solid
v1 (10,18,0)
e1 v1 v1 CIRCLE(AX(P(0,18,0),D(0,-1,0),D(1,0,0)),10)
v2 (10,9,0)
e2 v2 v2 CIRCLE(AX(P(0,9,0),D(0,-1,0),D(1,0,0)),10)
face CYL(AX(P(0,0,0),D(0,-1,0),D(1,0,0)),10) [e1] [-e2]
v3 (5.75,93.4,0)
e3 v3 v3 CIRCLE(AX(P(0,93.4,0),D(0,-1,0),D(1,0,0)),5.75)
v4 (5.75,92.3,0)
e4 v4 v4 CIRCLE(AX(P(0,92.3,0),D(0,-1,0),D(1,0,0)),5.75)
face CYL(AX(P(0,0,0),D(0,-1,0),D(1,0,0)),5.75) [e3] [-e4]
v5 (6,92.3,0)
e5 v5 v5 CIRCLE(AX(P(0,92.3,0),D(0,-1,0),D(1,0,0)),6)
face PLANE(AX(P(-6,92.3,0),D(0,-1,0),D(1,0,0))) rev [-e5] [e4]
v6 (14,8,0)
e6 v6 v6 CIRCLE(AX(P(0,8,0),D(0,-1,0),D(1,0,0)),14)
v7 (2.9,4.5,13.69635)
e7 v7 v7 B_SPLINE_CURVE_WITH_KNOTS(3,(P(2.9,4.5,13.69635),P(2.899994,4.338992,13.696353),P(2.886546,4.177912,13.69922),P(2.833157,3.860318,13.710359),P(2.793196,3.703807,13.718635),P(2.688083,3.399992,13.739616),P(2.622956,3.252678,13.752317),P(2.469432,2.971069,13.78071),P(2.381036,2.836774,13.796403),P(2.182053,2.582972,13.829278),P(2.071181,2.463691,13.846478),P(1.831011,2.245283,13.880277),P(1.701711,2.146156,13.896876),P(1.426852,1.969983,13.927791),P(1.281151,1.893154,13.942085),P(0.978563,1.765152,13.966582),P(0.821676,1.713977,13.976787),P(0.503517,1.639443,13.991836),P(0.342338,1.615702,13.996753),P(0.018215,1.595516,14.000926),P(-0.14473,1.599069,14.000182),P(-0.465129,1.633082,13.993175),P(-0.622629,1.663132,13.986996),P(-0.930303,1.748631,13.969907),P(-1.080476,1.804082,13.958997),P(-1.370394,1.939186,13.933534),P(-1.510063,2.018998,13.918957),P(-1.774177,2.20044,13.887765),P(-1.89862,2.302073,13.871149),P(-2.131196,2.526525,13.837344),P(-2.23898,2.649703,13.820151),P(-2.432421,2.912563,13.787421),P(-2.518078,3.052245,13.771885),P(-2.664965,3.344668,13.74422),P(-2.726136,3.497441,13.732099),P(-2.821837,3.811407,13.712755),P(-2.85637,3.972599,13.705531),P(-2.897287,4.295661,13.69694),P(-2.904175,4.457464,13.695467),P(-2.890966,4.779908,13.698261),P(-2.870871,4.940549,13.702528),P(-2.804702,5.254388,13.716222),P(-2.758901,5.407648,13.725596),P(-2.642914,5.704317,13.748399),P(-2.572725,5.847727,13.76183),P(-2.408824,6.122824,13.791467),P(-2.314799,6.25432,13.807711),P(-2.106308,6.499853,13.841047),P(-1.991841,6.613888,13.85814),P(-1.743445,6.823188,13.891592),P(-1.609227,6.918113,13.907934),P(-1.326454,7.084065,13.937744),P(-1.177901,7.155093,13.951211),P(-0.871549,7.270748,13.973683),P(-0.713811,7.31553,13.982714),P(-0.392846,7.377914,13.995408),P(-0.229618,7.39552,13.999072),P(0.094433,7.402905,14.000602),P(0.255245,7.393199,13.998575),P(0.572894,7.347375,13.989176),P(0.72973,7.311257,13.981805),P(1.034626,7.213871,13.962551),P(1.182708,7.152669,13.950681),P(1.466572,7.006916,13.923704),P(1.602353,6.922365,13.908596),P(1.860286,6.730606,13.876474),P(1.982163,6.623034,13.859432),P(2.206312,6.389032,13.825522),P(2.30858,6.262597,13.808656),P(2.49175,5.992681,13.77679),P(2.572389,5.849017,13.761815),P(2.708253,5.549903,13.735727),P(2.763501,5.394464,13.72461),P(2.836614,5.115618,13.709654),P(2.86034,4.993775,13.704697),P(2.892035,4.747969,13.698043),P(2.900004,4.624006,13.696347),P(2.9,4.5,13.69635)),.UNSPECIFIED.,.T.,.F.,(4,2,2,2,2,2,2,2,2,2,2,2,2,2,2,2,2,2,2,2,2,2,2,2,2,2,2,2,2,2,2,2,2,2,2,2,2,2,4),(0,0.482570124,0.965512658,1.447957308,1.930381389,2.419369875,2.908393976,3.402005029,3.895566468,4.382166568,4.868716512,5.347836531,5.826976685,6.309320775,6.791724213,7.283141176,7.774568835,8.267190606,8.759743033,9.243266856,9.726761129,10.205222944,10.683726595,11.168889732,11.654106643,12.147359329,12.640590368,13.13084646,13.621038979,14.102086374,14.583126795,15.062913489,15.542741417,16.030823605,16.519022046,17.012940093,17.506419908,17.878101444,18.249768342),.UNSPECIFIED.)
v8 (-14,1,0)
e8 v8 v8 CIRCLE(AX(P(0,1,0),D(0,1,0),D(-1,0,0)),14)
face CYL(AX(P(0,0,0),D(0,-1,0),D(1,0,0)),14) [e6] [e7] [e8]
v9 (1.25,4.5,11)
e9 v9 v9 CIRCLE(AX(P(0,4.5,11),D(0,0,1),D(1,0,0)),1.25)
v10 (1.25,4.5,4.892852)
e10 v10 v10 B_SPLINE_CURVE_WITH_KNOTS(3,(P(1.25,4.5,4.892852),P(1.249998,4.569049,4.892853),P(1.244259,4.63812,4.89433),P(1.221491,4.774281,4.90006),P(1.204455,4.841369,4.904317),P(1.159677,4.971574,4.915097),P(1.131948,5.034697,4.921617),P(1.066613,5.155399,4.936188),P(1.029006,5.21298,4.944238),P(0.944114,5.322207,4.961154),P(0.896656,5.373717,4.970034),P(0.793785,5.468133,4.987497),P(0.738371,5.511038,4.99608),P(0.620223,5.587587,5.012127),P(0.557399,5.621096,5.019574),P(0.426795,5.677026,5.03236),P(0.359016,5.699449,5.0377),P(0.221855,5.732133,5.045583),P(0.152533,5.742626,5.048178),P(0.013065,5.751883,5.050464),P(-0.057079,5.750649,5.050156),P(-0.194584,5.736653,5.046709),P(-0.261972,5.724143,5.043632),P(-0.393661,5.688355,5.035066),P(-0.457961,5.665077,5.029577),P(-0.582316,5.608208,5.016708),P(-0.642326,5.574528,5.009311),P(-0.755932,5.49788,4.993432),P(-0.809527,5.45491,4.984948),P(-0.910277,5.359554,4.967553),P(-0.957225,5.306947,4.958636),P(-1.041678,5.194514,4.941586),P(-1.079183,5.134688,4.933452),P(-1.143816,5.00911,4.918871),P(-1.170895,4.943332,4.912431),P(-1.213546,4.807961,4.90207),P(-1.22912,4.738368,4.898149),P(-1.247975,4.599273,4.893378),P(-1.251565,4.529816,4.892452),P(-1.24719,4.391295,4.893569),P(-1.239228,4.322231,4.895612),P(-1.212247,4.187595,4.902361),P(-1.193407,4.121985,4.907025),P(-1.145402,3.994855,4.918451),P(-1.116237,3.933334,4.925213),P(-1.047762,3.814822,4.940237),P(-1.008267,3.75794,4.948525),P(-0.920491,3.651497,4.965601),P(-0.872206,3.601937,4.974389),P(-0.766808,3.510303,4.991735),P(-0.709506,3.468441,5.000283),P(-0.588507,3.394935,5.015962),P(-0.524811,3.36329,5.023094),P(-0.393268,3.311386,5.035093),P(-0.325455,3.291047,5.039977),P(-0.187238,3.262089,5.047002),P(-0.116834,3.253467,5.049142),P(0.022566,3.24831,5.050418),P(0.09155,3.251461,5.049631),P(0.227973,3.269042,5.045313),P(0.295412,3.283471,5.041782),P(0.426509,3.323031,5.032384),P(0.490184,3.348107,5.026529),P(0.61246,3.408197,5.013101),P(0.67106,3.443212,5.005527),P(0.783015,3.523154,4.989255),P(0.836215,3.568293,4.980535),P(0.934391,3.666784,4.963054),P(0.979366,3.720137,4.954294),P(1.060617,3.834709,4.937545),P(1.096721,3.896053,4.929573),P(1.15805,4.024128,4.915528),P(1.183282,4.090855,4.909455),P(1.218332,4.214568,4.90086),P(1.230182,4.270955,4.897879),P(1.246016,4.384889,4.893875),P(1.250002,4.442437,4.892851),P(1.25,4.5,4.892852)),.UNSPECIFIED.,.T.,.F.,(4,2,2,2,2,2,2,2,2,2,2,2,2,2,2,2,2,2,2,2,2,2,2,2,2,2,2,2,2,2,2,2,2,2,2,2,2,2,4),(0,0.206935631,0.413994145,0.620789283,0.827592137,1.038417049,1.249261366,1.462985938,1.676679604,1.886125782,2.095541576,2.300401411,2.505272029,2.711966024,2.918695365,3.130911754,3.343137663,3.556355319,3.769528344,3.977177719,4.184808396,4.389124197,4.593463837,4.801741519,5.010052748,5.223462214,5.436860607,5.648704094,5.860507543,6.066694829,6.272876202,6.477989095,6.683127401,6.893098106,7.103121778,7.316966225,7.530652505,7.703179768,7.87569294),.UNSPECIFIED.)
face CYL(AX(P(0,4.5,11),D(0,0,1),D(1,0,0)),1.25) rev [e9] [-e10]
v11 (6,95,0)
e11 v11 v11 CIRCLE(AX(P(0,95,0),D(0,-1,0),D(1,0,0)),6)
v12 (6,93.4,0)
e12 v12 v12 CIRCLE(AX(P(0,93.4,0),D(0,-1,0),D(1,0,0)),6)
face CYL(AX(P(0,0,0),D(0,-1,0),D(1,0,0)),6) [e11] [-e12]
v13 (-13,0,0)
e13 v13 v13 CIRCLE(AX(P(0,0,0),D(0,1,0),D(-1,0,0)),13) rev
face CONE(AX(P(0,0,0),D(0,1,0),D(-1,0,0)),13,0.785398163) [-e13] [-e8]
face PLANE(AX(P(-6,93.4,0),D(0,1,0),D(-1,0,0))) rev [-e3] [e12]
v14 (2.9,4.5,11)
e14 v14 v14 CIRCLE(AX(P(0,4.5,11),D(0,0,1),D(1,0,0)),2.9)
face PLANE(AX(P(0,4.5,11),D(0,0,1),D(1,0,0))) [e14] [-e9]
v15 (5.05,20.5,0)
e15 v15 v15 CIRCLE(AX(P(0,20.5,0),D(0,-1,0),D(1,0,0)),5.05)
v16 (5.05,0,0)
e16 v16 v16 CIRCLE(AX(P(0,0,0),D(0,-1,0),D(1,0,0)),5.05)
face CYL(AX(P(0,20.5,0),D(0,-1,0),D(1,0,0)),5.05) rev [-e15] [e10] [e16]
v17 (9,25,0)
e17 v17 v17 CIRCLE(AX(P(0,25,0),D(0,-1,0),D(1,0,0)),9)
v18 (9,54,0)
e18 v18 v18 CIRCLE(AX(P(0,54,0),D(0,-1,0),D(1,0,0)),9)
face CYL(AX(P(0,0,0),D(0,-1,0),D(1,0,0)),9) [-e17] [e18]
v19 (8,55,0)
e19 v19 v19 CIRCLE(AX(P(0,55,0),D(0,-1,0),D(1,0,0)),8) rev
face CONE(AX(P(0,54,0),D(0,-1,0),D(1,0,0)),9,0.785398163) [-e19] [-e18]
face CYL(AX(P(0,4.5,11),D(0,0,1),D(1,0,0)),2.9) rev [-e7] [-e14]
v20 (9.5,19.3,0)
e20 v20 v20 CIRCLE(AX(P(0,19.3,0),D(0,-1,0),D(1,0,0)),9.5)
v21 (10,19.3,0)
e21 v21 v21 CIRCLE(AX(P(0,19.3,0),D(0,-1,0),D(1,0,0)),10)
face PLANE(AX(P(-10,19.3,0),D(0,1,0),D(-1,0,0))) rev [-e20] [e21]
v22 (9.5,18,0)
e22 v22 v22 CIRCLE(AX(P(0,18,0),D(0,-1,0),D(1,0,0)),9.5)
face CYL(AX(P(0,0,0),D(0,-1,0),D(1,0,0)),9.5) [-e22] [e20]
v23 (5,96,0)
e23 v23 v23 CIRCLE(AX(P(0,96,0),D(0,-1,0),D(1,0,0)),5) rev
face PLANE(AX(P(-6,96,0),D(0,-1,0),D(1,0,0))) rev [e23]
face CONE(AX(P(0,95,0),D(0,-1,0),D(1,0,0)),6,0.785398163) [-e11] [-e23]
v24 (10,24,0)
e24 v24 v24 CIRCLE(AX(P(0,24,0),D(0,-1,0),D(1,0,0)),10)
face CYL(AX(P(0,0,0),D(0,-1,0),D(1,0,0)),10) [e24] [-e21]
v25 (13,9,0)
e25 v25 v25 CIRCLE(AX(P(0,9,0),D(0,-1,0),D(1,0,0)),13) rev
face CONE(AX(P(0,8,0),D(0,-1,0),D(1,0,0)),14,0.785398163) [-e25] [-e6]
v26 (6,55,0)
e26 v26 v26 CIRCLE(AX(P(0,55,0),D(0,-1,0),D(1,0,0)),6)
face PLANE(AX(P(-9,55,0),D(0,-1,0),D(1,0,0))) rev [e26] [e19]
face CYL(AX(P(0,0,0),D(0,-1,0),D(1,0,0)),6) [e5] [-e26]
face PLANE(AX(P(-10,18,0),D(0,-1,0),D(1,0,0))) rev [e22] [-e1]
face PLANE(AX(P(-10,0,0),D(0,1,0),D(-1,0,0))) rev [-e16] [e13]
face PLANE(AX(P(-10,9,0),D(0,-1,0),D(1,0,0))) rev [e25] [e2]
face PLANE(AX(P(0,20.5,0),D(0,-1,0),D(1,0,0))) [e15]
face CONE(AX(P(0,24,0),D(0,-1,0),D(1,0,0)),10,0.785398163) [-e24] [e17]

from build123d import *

# Parameters (mm, degrees)
CHAMFER2_SIZE               = 1
CHAMFER7_SIZE               = 1
CHAMFER8_SIZE               = 1
CHAMFER9_SIZE               = 1
SKETCH2_R                   = 5.05
CUT_EXTRUDE1_DEPTH          = 20.5
SKETCH3_R                   = 2.9
CUT_EXTRUDE2_DEPTH          = 3
TAP_DRILL_FOR_M3_TAP1_D     = 2.5
TAP_DRILL_FOR_M3_TAP1_DEPTH = 8
TAP_DRILL_FOR_M3_TAP1_TIP   = 0.751075774


with BuildPart() as part:
    # Sketch1 → Revolve1 (revolve)
    with BuildSketch(Plane.XY, mode=Mode.PRIVATE) as revolve1_sk:
        Polygon((0, 0), (-10, 0), (-14, 0), (-14, 9), (-10, 9), (-10, 18), (-9.5, 18), (-9.5, 19.3), (-10, 19.3), (-10, 25), (-9, 25), (-9, 55), (-6, 55), (-6, 92.3), (-5.75, 92.3), (-5.75, 93.4), (-6, 93.4), (-6, 96), (0, 96), align=None)
    revolve(revolve1_sk.sketch.rotate(Axis((0, 0, 0), (0, 1, 0)), 180), axis=Axis((0, 0, 0), (0, 1, 0)))

    # Chamfer2
    chamfer2_edges = [part.edges().sort_by_distance(p)[0] for p in [
        (-6, 96, 0),
    ]]
    chamfer(chamfer2_edges, length=CHAMFER2_SIZE)

    # Chamfer7
    chamfer7_edges = [part.edges().sort_by_distance(p)[0] for p in [
        (-9, 55, 0),
    ]]
    chamfer(chamfer7_edges, length=CHAMFER7_SIZE)

    # Chamfer8
    chamfer8_edges = [part.edges().sort_by_distance(p)[0] for p in [
        (-10, 25, 0),
    ]]
    chamfer(chamfer8_edges, length=CHAMFER8_SIZE - 0.0001)  # a hair under: the kernel refuses the full size

    # Chamfer9
    chamfer9_edges = [part.edges().sort_by_distance(p)[0] for p in [
        (-14, 9, 0),
        (-14, 0, 0),
    ]]
    chamfer(chamfer9_edges, length=CHAMFER9_SIZE)

    # Sketch2 → Cut-Extrude1 (cut)
    with BuildSketch(Plane.XZ):
        Circle(SKETCH2_R)
    extrude(amount=-CUT_EXTRUDE1_DEPTH, mode=Mode.SUBTRACT)

    # Sketch3 → Cut-Extrude2 (cut)
    with BuildSketch(Plane.XY.offset(14)):
        with Locations((0, 4.5)):
            Circle(SKETCH3_R)
    extrude(amount=-CUT_EXTRUDE2_DEPTH, mode=Mode.SUBTRACT)

    # Tap Drill for M3 Tap1
    with Locations(Plane(origin=(0, 4.5, 11), x_dir=(1, 0, 0), z_dir=(0, 0, 1))):
        with Locations((0, 0)):
            Hole(TAP_DRILL_FOR_M3_TAP1_D / 2, depth=TAP_DRILL_FOR_M3_TAP1_DEPTH)
            with Locations((0, 0, -(TAP_DRILL_FOR_M3_TAP1_DEPTH + TAP_DRILL_FOR_M3_TAP1_TIP / 2))):  # 118° drill point
                Cone(0, TAP_DRILL_FOR_M3_TAP1_D / 2, TAP_DRILL_FOR_M3_TAP1_TIP, mode=Mode.SUBTRACT)


solid = part.part
